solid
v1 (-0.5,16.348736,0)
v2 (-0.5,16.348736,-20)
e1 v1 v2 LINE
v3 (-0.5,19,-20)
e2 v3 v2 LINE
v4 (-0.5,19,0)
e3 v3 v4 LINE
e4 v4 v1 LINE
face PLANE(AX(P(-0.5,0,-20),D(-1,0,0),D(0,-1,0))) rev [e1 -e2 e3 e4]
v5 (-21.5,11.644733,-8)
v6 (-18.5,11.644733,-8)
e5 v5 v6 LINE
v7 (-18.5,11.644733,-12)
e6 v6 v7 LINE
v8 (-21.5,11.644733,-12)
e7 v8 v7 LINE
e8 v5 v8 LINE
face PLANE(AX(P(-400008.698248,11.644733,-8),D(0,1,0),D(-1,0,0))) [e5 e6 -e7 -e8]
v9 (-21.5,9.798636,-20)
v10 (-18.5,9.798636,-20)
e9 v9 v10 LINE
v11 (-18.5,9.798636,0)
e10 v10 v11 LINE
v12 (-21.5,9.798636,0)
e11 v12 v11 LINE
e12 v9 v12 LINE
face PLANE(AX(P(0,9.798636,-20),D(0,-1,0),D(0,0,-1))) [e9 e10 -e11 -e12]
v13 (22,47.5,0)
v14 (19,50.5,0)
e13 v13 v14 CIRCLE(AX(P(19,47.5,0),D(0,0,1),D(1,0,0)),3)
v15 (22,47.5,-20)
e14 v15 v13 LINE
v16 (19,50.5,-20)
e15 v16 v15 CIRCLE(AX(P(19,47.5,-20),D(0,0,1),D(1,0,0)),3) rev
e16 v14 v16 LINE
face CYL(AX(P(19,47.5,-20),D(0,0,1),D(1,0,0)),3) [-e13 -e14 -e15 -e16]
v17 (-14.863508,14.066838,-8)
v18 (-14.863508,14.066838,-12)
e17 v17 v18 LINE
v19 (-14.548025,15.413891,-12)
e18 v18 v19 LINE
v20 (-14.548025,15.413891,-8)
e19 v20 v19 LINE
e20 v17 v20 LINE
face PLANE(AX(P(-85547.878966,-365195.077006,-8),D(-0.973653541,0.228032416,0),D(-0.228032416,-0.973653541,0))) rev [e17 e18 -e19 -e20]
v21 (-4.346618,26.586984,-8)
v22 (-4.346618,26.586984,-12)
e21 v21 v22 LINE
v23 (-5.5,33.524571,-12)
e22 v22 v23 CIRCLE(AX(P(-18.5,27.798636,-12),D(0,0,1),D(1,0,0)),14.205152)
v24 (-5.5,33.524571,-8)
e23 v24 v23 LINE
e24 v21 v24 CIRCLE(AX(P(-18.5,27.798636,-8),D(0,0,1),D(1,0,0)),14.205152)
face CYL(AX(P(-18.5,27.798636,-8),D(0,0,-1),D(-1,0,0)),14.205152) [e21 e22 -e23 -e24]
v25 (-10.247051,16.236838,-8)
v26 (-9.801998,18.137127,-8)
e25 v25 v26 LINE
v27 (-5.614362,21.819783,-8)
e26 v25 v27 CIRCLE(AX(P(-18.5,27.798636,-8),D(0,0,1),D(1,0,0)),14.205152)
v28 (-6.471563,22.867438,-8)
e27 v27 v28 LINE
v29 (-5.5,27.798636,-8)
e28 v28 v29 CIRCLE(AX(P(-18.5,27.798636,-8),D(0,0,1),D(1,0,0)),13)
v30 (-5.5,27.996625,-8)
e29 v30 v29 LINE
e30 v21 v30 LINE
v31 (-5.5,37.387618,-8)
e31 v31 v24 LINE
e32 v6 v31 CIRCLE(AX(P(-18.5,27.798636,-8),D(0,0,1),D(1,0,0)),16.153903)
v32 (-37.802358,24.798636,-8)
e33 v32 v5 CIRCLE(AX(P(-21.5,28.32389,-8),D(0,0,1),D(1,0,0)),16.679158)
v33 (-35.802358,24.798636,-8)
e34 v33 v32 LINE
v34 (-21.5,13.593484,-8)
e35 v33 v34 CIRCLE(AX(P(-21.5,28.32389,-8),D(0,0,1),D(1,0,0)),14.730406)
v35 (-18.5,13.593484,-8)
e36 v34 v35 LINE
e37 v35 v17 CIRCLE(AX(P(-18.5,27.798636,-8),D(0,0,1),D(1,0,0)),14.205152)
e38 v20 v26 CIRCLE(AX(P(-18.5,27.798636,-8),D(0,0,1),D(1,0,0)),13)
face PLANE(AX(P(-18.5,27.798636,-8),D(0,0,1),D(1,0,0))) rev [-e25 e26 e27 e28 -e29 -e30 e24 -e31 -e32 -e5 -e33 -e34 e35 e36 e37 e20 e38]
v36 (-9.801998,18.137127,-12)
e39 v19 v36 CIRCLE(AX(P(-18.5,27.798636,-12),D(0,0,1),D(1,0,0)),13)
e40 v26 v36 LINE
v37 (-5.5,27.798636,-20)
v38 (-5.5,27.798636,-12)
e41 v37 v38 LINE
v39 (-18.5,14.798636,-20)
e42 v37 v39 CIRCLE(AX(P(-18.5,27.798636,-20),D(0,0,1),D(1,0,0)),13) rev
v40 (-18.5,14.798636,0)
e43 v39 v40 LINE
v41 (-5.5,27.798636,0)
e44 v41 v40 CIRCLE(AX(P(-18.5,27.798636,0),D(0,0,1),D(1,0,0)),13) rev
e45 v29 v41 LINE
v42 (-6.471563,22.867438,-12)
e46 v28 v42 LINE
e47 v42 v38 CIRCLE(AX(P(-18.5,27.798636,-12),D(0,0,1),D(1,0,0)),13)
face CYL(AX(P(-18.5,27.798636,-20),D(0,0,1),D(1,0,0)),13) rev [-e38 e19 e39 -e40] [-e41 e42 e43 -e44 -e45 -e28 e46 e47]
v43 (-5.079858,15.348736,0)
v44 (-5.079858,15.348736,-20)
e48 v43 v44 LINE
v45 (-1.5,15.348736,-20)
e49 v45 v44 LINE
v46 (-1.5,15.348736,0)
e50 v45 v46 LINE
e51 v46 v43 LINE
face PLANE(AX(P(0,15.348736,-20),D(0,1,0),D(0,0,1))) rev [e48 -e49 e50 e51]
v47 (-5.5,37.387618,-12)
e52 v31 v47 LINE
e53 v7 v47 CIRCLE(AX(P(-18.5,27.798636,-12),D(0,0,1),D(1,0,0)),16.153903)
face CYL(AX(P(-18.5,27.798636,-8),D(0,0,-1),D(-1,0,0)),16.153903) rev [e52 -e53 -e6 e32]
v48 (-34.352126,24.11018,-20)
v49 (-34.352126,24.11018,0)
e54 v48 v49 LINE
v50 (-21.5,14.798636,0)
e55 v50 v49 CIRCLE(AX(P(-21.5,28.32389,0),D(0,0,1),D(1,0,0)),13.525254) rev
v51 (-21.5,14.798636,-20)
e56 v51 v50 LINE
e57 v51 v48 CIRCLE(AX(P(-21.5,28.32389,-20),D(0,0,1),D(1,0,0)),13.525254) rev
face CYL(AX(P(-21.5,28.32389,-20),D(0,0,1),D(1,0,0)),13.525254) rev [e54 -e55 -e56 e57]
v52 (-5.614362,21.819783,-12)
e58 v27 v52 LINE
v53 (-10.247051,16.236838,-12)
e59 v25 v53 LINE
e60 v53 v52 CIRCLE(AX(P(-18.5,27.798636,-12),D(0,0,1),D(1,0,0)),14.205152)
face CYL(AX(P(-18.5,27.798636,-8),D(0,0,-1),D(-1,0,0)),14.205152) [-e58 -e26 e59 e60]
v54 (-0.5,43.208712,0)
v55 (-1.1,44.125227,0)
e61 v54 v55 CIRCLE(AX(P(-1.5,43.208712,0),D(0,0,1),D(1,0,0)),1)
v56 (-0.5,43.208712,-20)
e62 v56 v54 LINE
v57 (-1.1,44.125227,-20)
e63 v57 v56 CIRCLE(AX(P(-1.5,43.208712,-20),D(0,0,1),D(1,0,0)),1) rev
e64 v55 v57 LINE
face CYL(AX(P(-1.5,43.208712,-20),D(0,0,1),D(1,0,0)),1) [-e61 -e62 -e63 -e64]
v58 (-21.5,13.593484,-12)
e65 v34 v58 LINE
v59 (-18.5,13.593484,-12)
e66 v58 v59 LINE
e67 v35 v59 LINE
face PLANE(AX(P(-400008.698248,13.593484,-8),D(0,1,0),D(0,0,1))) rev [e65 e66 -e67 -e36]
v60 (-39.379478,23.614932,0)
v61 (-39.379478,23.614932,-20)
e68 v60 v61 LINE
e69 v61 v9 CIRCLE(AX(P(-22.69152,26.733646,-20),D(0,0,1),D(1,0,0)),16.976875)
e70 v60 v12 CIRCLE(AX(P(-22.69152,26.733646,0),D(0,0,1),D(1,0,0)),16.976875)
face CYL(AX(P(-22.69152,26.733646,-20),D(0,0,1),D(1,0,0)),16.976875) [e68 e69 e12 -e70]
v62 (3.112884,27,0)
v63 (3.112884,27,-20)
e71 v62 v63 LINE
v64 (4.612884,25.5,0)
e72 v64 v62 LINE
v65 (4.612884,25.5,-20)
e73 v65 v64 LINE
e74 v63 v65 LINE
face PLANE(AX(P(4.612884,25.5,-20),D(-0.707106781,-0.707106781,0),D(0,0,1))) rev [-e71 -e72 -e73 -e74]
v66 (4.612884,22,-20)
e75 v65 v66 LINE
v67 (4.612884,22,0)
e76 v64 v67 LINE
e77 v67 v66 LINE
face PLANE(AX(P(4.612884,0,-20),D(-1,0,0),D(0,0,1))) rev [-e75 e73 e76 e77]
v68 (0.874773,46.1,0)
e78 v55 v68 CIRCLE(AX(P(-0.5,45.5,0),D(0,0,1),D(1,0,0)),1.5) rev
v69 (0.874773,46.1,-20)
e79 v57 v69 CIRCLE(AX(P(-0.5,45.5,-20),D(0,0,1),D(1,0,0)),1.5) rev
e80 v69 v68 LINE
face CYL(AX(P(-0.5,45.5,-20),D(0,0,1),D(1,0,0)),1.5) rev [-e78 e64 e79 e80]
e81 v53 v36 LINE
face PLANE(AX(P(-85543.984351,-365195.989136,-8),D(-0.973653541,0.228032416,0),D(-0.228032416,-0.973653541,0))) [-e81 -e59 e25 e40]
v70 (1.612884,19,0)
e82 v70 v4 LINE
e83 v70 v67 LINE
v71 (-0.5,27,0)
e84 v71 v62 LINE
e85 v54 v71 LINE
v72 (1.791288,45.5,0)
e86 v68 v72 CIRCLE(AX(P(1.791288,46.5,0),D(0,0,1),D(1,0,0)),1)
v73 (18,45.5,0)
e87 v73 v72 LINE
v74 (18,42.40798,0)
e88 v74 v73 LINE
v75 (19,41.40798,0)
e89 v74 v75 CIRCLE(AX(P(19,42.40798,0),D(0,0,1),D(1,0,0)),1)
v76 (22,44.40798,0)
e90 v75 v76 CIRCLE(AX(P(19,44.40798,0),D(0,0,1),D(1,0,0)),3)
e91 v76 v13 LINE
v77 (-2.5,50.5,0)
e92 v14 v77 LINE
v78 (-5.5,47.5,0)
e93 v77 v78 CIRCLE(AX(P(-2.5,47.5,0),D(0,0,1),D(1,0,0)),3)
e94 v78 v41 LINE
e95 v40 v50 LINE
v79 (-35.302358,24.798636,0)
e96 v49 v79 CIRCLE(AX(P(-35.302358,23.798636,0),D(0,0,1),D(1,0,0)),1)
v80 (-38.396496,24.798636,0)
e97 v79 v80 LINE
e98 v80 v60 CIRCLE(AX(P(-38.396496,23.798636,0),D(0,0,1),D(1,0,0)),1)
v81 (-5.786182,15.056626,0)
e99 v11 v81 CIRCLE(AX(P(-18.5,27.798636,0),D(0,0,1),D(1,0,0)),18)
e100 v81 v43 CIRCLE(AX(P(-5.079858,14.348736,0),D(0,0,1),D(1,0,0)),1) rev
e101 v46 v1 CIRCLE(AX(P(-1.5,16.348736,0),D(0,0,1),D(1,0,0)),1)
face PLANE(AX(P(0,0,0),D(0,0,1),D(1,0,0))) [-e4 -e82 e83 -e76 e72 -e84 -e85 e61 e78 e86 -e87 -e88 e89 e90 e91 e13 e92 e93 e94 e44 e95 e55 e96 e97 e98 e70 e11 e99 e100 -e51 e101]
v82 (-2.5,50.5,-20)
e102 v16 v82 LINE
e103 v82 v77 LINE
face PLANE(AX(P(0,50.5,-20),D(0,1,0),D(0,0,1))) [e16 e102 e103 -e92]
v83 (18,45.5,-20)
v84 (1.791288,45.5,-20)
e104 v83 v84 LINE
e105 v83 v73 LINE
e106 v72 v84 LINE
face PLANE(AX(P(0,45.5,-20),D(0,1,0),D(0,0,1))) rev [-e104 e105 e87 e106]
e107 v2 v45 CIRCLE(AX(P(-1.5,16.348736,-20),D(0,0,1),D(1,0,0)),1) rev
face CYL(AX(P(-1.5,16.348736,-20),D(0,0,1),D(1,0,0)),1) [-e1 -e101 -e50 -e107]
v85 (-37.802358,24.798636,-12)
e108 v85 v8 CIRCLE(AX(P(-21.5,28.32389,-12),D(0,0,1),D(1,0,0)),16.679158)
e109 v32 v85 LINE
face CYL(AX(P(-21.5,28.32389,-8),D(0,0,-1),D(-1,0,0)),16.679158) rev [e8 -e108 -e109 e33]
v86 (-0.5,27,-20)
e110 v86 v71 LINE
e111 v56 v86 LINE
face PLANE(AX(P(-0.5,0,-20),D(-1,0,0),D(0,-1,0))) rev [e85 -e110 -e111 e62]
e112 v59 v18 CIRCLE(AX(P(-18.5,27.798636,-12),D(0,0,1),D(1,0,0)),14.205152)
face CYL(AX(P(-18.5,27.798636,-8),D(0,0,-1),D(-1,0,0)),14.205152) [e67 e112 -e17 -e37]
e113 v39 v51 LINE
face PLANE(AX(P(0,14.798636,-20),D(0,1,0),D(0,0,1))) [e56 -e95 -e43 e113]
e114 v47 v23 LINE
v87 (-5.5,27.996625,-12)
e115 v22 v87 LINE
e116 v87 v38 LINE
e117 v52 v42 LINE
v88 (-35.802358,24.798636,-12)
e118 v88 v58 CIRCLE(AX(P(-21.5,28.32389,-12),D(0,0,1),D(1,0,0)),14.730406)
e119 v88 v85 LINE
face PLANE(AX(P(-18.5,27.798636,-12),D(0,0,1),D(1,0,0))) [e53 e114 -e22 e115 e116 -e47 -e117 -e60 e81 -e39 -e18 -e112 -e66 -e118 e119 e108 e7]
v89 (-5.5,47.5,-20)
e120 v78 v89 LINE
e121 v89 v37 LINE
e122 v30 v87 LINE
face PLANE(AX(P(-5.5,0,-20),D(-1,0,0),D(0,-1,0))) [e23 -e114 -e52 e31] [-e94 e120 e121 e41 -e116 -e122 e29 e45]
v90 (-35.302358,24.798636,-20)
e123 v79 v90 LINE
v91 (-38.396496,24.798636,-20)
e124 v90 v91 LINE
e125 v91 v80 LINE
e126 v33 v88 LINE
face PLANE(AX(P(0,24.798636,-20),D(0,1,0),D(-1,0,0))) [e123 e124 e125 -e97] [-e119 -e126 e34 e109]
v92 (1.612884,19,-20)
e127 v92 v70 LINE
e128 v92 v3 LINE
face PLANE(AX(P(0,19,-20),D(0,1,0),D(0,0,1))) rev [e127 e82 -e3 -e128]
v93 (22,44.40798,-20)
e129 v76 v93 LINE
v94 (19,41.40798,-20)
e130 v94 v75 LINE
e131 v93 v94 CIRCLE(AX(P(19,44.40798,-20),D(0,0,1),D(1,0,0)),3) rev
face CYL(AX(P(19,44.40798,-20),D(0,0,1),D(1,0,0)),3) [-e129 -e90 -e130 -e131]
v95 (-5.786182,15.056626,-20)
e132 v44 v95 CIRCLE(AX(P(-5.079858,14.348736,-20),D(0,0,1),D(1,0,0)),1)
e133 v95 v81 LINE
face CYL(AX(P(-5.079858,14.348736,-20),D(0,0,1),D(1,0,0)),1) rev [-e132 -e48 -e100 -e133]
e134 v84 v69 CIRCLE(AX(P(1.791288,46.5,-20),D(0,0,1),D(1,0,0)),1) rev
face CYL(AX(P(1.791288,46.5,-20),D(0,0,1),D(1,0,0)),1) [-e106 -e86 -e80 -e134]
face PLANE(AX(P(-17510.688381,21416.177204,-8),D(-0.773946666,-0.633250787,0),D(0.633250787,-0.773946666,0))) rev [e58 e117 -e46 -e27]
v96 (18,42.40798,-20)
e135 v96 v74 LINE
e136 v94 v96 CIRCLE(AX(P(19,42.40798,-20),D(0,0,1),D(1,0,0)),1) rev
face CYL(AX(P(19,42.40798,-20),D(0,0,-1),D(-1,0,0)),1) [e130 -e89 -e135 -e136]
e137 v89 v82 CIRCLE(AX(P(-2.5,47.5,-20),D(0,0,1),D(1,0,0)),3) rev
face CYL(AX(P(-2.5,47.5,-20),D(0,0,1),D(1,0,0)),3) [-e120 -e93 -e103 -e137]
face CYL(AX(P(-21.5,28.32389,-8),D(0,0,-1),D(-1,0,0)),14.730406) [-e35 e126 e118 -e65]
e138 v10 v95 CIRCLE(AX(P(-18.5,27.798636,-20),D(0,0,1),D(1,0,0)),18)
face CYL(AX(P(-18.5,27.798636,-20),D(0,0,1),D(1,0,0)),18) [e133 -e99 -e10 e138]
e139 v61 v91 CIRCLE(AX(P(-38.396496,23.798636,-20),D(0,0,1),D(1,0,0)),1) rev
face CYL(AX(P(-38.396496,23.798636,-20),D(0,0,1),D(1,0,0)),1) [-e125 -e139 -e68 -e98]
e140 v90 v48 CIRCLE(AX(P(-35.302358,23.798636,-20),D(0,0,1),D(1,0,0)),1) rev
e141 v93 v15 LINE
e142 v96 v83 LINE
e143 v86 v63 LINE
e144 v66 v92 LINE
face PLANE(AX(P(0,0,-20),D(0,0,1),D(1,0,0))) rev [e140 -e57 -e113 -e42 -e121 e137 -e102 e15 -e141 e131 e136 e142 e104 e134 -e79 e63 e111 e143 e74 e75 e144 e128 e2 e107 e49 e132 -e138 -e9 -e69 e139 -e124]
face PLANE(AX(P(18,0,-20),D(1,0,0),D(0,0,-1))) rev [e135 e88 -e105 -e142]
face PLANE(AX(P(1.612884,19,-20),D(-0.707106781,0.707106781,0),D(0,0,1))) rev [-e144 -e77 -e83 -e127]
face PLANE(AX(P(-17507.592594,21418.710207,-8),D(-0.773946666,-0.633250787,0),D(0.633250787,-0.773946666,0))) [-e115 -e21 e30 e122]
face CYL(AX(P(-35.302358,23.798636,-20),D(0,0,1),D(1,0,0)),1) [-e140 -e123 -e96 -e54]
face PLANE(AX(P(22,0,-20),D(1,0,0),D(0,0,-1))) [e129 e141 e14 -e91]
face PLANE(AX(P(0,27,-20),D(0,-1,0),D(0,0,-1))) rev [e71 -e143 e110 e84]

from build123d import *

# Parameters (mm, degrees)
BOSS_EXTRUDE1_DEPTH     = 20
FILLET1_R               = 3
CHAMFER1_SIZE           = 3
FILLET2_R               = 1
CUT_EXTRUDE1_DEPTH      = 2
CUT_EXTRUDE1_DEPTH_BACK = 2
CUT_EXTRUDE1_START      = -10
CHAMFER2_SIZE           = 1.5


with BuildPart() as part:
    # Sketch1 → Boss-Extrude1 (new body)
    with BuildSketch(Plane.XY):
        with BuildLine():
            Line((18, 45.5), (18, 41.407980081))
            Line((18, 41.407980081), (22, 41.407980081))
            Line((22, 41.407980081), (22, 50.5))
            Line((22, 50.5), (-5.5, 50.5))
            Line((-5.5, 50.5), (-5.5, 27.798635693))
            ThreePointArc((-5.5, 27.798635693), (-9.307611845, 18.606247538), (-18.5, 14.798635693))
            Line((-18.5, 14.798635693), (-21.5, 14.798635693))
            ThreePointArc((-21.5, 14.798635693), (-29.723519433, 17.585816031), (-34.557759664, 24.798635693))
            Line((-34.557759664, 24.798635693), (-39.557759664, 24.798635693))
            ThreePointArc((-39.557759664, 24.798635693), (-33.539294452, 13.674546113), (-21.5, 9.798635693))
            Line((-21.5, 9.798635693), (-18.5, 9.798635693))
            ThreePointArc((-18.5, 9.798635693), (-11.432404679, 11.244207392), (-5.5, 15.348736095))
            Line((-5.5, 15.348736095), (-0.5, 15.348736095))
            Line((-0.5, 15.348736095), (-0.5, 19))
            Line((-0.5, 19), (4.612884421, 19))
            Line((4.612884421, 19), (4.612884421, 27))
            Line((4.612884421, 27), (-0.5, 27))
            Line((-0.5, 27), (-0.5, 44))
            ThreePointArc((-0.5, 44), (-1.560660172, 46.560660172), (1, 45.5))
            Line((1, 45.5), (18, 45.5))
        make_face()
    extrude(amount=-BOSS_EXTRUDE1_DEPTH)

    # Fillet1
    fillet1_edges = [part.edges().sort_by_distance(p)[0] for p in [
        (-5.5, 50.5, -10),
        (22, 50.5, -10),
        (22, 41.407980081, -10),
    ]]
    fillet(fillet1_edges, radius=FILLET1_R)

    # Chamfer1
    chamfer1_edges = [part.edges().sort_by_distance(p)[0] for p in [
        (4.612884421, 19, -10),
    ]]
    chamfer(chamfer1_edges, length=CHAMFER1_SIZE)

    # Fillet2
    fillet2_edges = [part.edges().sort_by_distance(p)[0] for p in [
        (18, 41.407980081, -10),
        (-0.5, 15.348736095, -10),
        (-5.5, 15.348736095, -10),
        (-34.557759664, 24.798635693, -10),
        (-39.557759664, 24.798635693, -10),
        (-0.5, 44, -10),
        (1, 45.5, -10),
    ]]
    fillet(fillet2_edges, radius=FILLET2_R - 0.0001)  # a hair under: the kernel refuses the full size

    # Sketch3 → Cut-Extrude1 (cut, two sides: drawn at the far end of the back side and taken through both)
    with BuildSketch(Plane.XY.offset(CUT_EXTRUDE1_START - CUT_EXTRUDE1_DEPTH_BACK)):
        with BuildLine():
            Line((-18.5, 13.593483966), (-21.5, 13.593483966))
            ThreePointArc((-21.5, 13.593483966), (-30.584504262, 16.728345827), (-35.80235804, 24.798635693))
            Line((-35.80235804, 24.798635693), (-37.80235804, 24.798635693))
            ThreePointArc((-37.80235804, 24.798635693), (-31.973681851, 15.343278195), (-21.5, 11.644732532))
            Line((-21.5, 11.644732532), (-18.5, 11.644732532))
            ThreePointArc((-18.5, 11.644732532), (-4.080428513, 20.516840208), (-5.5, 37.387618296))
            Line((-5.5, 37.387618296), (-5.5, 33.524571041))
            ThreePointArc((-5.5, 33.524571041), (-4.487181784, 30.128284006), (-4.346617542, 26.586983672))
            ThreePointArc((-4.346617542, 26.586983672), (-4.771973785, 24.147932767), (-5.614362182, 21.819783493))
            ThreePointArc((-5.614362182, 21.819783493), (-7.568289903, 18.727580078), (-10.247050758, 16.236838064))
            ThreePointArc((-10.247050758, 16.236838064), (-12.457076385, 14.94292063), (-14.8635084, 14.066838125))
            ThreePointArc((-14.8635084, 14.066838125), (-16.666415033, 13.712319575), (-18.5, 13.593483966))
        make_face()
        with BuildLine():
            Line((-6.471563344, 22.867437906), (-5.614362182, 21.819783493))
            ThreePointArc((-5.614362182, 21.819783493), (-4.771973785, 24.147932767), (-4.346617542, 26.586983672))
            Line((-4.346617542, 26.586983672), (-5.5, 27.996625043))
            Line((-5.5, 27.996625043), (-5.5, 27.798635693))
            ThreePointArc((-5.5, 27.798635693), (-5.745203323, 25.285637139), (-6.471563344, 22.867437906))
        make_face()
        with BuildLine():
            Line((-14.54802471, 15.413891396), (-14.8635084, 14.066838125))
            ThreePointArc((-14.8635084, 14.066838125), (-12.457076385, 14.94292063), (-10.247050758, 16.236838064))
            Line((-10.247050758, 16.236838064), (-9.8019978, 18.137126612))
            ThreePointArc((-9.8019978, 18.137126612), (-12.030109342, 16.522975408), (-14.54802471, 15.413891396))
        make_face()
    extrude(amount=CUT_EXTRUDE1_DEPTH + CUT_EXTRUDE1_DEPTH_BACK, mode=Mode.SUBTRACT)

    # Chamfer2
    chamfer2_edges = [part.edges().sort_by_distance(p)[0] for p in [
        (4.612884421, 27, -10),
    ]]
    chamfer(chamfer2_edges, length=CHAMFER2_SIZE)


solid = part.part
